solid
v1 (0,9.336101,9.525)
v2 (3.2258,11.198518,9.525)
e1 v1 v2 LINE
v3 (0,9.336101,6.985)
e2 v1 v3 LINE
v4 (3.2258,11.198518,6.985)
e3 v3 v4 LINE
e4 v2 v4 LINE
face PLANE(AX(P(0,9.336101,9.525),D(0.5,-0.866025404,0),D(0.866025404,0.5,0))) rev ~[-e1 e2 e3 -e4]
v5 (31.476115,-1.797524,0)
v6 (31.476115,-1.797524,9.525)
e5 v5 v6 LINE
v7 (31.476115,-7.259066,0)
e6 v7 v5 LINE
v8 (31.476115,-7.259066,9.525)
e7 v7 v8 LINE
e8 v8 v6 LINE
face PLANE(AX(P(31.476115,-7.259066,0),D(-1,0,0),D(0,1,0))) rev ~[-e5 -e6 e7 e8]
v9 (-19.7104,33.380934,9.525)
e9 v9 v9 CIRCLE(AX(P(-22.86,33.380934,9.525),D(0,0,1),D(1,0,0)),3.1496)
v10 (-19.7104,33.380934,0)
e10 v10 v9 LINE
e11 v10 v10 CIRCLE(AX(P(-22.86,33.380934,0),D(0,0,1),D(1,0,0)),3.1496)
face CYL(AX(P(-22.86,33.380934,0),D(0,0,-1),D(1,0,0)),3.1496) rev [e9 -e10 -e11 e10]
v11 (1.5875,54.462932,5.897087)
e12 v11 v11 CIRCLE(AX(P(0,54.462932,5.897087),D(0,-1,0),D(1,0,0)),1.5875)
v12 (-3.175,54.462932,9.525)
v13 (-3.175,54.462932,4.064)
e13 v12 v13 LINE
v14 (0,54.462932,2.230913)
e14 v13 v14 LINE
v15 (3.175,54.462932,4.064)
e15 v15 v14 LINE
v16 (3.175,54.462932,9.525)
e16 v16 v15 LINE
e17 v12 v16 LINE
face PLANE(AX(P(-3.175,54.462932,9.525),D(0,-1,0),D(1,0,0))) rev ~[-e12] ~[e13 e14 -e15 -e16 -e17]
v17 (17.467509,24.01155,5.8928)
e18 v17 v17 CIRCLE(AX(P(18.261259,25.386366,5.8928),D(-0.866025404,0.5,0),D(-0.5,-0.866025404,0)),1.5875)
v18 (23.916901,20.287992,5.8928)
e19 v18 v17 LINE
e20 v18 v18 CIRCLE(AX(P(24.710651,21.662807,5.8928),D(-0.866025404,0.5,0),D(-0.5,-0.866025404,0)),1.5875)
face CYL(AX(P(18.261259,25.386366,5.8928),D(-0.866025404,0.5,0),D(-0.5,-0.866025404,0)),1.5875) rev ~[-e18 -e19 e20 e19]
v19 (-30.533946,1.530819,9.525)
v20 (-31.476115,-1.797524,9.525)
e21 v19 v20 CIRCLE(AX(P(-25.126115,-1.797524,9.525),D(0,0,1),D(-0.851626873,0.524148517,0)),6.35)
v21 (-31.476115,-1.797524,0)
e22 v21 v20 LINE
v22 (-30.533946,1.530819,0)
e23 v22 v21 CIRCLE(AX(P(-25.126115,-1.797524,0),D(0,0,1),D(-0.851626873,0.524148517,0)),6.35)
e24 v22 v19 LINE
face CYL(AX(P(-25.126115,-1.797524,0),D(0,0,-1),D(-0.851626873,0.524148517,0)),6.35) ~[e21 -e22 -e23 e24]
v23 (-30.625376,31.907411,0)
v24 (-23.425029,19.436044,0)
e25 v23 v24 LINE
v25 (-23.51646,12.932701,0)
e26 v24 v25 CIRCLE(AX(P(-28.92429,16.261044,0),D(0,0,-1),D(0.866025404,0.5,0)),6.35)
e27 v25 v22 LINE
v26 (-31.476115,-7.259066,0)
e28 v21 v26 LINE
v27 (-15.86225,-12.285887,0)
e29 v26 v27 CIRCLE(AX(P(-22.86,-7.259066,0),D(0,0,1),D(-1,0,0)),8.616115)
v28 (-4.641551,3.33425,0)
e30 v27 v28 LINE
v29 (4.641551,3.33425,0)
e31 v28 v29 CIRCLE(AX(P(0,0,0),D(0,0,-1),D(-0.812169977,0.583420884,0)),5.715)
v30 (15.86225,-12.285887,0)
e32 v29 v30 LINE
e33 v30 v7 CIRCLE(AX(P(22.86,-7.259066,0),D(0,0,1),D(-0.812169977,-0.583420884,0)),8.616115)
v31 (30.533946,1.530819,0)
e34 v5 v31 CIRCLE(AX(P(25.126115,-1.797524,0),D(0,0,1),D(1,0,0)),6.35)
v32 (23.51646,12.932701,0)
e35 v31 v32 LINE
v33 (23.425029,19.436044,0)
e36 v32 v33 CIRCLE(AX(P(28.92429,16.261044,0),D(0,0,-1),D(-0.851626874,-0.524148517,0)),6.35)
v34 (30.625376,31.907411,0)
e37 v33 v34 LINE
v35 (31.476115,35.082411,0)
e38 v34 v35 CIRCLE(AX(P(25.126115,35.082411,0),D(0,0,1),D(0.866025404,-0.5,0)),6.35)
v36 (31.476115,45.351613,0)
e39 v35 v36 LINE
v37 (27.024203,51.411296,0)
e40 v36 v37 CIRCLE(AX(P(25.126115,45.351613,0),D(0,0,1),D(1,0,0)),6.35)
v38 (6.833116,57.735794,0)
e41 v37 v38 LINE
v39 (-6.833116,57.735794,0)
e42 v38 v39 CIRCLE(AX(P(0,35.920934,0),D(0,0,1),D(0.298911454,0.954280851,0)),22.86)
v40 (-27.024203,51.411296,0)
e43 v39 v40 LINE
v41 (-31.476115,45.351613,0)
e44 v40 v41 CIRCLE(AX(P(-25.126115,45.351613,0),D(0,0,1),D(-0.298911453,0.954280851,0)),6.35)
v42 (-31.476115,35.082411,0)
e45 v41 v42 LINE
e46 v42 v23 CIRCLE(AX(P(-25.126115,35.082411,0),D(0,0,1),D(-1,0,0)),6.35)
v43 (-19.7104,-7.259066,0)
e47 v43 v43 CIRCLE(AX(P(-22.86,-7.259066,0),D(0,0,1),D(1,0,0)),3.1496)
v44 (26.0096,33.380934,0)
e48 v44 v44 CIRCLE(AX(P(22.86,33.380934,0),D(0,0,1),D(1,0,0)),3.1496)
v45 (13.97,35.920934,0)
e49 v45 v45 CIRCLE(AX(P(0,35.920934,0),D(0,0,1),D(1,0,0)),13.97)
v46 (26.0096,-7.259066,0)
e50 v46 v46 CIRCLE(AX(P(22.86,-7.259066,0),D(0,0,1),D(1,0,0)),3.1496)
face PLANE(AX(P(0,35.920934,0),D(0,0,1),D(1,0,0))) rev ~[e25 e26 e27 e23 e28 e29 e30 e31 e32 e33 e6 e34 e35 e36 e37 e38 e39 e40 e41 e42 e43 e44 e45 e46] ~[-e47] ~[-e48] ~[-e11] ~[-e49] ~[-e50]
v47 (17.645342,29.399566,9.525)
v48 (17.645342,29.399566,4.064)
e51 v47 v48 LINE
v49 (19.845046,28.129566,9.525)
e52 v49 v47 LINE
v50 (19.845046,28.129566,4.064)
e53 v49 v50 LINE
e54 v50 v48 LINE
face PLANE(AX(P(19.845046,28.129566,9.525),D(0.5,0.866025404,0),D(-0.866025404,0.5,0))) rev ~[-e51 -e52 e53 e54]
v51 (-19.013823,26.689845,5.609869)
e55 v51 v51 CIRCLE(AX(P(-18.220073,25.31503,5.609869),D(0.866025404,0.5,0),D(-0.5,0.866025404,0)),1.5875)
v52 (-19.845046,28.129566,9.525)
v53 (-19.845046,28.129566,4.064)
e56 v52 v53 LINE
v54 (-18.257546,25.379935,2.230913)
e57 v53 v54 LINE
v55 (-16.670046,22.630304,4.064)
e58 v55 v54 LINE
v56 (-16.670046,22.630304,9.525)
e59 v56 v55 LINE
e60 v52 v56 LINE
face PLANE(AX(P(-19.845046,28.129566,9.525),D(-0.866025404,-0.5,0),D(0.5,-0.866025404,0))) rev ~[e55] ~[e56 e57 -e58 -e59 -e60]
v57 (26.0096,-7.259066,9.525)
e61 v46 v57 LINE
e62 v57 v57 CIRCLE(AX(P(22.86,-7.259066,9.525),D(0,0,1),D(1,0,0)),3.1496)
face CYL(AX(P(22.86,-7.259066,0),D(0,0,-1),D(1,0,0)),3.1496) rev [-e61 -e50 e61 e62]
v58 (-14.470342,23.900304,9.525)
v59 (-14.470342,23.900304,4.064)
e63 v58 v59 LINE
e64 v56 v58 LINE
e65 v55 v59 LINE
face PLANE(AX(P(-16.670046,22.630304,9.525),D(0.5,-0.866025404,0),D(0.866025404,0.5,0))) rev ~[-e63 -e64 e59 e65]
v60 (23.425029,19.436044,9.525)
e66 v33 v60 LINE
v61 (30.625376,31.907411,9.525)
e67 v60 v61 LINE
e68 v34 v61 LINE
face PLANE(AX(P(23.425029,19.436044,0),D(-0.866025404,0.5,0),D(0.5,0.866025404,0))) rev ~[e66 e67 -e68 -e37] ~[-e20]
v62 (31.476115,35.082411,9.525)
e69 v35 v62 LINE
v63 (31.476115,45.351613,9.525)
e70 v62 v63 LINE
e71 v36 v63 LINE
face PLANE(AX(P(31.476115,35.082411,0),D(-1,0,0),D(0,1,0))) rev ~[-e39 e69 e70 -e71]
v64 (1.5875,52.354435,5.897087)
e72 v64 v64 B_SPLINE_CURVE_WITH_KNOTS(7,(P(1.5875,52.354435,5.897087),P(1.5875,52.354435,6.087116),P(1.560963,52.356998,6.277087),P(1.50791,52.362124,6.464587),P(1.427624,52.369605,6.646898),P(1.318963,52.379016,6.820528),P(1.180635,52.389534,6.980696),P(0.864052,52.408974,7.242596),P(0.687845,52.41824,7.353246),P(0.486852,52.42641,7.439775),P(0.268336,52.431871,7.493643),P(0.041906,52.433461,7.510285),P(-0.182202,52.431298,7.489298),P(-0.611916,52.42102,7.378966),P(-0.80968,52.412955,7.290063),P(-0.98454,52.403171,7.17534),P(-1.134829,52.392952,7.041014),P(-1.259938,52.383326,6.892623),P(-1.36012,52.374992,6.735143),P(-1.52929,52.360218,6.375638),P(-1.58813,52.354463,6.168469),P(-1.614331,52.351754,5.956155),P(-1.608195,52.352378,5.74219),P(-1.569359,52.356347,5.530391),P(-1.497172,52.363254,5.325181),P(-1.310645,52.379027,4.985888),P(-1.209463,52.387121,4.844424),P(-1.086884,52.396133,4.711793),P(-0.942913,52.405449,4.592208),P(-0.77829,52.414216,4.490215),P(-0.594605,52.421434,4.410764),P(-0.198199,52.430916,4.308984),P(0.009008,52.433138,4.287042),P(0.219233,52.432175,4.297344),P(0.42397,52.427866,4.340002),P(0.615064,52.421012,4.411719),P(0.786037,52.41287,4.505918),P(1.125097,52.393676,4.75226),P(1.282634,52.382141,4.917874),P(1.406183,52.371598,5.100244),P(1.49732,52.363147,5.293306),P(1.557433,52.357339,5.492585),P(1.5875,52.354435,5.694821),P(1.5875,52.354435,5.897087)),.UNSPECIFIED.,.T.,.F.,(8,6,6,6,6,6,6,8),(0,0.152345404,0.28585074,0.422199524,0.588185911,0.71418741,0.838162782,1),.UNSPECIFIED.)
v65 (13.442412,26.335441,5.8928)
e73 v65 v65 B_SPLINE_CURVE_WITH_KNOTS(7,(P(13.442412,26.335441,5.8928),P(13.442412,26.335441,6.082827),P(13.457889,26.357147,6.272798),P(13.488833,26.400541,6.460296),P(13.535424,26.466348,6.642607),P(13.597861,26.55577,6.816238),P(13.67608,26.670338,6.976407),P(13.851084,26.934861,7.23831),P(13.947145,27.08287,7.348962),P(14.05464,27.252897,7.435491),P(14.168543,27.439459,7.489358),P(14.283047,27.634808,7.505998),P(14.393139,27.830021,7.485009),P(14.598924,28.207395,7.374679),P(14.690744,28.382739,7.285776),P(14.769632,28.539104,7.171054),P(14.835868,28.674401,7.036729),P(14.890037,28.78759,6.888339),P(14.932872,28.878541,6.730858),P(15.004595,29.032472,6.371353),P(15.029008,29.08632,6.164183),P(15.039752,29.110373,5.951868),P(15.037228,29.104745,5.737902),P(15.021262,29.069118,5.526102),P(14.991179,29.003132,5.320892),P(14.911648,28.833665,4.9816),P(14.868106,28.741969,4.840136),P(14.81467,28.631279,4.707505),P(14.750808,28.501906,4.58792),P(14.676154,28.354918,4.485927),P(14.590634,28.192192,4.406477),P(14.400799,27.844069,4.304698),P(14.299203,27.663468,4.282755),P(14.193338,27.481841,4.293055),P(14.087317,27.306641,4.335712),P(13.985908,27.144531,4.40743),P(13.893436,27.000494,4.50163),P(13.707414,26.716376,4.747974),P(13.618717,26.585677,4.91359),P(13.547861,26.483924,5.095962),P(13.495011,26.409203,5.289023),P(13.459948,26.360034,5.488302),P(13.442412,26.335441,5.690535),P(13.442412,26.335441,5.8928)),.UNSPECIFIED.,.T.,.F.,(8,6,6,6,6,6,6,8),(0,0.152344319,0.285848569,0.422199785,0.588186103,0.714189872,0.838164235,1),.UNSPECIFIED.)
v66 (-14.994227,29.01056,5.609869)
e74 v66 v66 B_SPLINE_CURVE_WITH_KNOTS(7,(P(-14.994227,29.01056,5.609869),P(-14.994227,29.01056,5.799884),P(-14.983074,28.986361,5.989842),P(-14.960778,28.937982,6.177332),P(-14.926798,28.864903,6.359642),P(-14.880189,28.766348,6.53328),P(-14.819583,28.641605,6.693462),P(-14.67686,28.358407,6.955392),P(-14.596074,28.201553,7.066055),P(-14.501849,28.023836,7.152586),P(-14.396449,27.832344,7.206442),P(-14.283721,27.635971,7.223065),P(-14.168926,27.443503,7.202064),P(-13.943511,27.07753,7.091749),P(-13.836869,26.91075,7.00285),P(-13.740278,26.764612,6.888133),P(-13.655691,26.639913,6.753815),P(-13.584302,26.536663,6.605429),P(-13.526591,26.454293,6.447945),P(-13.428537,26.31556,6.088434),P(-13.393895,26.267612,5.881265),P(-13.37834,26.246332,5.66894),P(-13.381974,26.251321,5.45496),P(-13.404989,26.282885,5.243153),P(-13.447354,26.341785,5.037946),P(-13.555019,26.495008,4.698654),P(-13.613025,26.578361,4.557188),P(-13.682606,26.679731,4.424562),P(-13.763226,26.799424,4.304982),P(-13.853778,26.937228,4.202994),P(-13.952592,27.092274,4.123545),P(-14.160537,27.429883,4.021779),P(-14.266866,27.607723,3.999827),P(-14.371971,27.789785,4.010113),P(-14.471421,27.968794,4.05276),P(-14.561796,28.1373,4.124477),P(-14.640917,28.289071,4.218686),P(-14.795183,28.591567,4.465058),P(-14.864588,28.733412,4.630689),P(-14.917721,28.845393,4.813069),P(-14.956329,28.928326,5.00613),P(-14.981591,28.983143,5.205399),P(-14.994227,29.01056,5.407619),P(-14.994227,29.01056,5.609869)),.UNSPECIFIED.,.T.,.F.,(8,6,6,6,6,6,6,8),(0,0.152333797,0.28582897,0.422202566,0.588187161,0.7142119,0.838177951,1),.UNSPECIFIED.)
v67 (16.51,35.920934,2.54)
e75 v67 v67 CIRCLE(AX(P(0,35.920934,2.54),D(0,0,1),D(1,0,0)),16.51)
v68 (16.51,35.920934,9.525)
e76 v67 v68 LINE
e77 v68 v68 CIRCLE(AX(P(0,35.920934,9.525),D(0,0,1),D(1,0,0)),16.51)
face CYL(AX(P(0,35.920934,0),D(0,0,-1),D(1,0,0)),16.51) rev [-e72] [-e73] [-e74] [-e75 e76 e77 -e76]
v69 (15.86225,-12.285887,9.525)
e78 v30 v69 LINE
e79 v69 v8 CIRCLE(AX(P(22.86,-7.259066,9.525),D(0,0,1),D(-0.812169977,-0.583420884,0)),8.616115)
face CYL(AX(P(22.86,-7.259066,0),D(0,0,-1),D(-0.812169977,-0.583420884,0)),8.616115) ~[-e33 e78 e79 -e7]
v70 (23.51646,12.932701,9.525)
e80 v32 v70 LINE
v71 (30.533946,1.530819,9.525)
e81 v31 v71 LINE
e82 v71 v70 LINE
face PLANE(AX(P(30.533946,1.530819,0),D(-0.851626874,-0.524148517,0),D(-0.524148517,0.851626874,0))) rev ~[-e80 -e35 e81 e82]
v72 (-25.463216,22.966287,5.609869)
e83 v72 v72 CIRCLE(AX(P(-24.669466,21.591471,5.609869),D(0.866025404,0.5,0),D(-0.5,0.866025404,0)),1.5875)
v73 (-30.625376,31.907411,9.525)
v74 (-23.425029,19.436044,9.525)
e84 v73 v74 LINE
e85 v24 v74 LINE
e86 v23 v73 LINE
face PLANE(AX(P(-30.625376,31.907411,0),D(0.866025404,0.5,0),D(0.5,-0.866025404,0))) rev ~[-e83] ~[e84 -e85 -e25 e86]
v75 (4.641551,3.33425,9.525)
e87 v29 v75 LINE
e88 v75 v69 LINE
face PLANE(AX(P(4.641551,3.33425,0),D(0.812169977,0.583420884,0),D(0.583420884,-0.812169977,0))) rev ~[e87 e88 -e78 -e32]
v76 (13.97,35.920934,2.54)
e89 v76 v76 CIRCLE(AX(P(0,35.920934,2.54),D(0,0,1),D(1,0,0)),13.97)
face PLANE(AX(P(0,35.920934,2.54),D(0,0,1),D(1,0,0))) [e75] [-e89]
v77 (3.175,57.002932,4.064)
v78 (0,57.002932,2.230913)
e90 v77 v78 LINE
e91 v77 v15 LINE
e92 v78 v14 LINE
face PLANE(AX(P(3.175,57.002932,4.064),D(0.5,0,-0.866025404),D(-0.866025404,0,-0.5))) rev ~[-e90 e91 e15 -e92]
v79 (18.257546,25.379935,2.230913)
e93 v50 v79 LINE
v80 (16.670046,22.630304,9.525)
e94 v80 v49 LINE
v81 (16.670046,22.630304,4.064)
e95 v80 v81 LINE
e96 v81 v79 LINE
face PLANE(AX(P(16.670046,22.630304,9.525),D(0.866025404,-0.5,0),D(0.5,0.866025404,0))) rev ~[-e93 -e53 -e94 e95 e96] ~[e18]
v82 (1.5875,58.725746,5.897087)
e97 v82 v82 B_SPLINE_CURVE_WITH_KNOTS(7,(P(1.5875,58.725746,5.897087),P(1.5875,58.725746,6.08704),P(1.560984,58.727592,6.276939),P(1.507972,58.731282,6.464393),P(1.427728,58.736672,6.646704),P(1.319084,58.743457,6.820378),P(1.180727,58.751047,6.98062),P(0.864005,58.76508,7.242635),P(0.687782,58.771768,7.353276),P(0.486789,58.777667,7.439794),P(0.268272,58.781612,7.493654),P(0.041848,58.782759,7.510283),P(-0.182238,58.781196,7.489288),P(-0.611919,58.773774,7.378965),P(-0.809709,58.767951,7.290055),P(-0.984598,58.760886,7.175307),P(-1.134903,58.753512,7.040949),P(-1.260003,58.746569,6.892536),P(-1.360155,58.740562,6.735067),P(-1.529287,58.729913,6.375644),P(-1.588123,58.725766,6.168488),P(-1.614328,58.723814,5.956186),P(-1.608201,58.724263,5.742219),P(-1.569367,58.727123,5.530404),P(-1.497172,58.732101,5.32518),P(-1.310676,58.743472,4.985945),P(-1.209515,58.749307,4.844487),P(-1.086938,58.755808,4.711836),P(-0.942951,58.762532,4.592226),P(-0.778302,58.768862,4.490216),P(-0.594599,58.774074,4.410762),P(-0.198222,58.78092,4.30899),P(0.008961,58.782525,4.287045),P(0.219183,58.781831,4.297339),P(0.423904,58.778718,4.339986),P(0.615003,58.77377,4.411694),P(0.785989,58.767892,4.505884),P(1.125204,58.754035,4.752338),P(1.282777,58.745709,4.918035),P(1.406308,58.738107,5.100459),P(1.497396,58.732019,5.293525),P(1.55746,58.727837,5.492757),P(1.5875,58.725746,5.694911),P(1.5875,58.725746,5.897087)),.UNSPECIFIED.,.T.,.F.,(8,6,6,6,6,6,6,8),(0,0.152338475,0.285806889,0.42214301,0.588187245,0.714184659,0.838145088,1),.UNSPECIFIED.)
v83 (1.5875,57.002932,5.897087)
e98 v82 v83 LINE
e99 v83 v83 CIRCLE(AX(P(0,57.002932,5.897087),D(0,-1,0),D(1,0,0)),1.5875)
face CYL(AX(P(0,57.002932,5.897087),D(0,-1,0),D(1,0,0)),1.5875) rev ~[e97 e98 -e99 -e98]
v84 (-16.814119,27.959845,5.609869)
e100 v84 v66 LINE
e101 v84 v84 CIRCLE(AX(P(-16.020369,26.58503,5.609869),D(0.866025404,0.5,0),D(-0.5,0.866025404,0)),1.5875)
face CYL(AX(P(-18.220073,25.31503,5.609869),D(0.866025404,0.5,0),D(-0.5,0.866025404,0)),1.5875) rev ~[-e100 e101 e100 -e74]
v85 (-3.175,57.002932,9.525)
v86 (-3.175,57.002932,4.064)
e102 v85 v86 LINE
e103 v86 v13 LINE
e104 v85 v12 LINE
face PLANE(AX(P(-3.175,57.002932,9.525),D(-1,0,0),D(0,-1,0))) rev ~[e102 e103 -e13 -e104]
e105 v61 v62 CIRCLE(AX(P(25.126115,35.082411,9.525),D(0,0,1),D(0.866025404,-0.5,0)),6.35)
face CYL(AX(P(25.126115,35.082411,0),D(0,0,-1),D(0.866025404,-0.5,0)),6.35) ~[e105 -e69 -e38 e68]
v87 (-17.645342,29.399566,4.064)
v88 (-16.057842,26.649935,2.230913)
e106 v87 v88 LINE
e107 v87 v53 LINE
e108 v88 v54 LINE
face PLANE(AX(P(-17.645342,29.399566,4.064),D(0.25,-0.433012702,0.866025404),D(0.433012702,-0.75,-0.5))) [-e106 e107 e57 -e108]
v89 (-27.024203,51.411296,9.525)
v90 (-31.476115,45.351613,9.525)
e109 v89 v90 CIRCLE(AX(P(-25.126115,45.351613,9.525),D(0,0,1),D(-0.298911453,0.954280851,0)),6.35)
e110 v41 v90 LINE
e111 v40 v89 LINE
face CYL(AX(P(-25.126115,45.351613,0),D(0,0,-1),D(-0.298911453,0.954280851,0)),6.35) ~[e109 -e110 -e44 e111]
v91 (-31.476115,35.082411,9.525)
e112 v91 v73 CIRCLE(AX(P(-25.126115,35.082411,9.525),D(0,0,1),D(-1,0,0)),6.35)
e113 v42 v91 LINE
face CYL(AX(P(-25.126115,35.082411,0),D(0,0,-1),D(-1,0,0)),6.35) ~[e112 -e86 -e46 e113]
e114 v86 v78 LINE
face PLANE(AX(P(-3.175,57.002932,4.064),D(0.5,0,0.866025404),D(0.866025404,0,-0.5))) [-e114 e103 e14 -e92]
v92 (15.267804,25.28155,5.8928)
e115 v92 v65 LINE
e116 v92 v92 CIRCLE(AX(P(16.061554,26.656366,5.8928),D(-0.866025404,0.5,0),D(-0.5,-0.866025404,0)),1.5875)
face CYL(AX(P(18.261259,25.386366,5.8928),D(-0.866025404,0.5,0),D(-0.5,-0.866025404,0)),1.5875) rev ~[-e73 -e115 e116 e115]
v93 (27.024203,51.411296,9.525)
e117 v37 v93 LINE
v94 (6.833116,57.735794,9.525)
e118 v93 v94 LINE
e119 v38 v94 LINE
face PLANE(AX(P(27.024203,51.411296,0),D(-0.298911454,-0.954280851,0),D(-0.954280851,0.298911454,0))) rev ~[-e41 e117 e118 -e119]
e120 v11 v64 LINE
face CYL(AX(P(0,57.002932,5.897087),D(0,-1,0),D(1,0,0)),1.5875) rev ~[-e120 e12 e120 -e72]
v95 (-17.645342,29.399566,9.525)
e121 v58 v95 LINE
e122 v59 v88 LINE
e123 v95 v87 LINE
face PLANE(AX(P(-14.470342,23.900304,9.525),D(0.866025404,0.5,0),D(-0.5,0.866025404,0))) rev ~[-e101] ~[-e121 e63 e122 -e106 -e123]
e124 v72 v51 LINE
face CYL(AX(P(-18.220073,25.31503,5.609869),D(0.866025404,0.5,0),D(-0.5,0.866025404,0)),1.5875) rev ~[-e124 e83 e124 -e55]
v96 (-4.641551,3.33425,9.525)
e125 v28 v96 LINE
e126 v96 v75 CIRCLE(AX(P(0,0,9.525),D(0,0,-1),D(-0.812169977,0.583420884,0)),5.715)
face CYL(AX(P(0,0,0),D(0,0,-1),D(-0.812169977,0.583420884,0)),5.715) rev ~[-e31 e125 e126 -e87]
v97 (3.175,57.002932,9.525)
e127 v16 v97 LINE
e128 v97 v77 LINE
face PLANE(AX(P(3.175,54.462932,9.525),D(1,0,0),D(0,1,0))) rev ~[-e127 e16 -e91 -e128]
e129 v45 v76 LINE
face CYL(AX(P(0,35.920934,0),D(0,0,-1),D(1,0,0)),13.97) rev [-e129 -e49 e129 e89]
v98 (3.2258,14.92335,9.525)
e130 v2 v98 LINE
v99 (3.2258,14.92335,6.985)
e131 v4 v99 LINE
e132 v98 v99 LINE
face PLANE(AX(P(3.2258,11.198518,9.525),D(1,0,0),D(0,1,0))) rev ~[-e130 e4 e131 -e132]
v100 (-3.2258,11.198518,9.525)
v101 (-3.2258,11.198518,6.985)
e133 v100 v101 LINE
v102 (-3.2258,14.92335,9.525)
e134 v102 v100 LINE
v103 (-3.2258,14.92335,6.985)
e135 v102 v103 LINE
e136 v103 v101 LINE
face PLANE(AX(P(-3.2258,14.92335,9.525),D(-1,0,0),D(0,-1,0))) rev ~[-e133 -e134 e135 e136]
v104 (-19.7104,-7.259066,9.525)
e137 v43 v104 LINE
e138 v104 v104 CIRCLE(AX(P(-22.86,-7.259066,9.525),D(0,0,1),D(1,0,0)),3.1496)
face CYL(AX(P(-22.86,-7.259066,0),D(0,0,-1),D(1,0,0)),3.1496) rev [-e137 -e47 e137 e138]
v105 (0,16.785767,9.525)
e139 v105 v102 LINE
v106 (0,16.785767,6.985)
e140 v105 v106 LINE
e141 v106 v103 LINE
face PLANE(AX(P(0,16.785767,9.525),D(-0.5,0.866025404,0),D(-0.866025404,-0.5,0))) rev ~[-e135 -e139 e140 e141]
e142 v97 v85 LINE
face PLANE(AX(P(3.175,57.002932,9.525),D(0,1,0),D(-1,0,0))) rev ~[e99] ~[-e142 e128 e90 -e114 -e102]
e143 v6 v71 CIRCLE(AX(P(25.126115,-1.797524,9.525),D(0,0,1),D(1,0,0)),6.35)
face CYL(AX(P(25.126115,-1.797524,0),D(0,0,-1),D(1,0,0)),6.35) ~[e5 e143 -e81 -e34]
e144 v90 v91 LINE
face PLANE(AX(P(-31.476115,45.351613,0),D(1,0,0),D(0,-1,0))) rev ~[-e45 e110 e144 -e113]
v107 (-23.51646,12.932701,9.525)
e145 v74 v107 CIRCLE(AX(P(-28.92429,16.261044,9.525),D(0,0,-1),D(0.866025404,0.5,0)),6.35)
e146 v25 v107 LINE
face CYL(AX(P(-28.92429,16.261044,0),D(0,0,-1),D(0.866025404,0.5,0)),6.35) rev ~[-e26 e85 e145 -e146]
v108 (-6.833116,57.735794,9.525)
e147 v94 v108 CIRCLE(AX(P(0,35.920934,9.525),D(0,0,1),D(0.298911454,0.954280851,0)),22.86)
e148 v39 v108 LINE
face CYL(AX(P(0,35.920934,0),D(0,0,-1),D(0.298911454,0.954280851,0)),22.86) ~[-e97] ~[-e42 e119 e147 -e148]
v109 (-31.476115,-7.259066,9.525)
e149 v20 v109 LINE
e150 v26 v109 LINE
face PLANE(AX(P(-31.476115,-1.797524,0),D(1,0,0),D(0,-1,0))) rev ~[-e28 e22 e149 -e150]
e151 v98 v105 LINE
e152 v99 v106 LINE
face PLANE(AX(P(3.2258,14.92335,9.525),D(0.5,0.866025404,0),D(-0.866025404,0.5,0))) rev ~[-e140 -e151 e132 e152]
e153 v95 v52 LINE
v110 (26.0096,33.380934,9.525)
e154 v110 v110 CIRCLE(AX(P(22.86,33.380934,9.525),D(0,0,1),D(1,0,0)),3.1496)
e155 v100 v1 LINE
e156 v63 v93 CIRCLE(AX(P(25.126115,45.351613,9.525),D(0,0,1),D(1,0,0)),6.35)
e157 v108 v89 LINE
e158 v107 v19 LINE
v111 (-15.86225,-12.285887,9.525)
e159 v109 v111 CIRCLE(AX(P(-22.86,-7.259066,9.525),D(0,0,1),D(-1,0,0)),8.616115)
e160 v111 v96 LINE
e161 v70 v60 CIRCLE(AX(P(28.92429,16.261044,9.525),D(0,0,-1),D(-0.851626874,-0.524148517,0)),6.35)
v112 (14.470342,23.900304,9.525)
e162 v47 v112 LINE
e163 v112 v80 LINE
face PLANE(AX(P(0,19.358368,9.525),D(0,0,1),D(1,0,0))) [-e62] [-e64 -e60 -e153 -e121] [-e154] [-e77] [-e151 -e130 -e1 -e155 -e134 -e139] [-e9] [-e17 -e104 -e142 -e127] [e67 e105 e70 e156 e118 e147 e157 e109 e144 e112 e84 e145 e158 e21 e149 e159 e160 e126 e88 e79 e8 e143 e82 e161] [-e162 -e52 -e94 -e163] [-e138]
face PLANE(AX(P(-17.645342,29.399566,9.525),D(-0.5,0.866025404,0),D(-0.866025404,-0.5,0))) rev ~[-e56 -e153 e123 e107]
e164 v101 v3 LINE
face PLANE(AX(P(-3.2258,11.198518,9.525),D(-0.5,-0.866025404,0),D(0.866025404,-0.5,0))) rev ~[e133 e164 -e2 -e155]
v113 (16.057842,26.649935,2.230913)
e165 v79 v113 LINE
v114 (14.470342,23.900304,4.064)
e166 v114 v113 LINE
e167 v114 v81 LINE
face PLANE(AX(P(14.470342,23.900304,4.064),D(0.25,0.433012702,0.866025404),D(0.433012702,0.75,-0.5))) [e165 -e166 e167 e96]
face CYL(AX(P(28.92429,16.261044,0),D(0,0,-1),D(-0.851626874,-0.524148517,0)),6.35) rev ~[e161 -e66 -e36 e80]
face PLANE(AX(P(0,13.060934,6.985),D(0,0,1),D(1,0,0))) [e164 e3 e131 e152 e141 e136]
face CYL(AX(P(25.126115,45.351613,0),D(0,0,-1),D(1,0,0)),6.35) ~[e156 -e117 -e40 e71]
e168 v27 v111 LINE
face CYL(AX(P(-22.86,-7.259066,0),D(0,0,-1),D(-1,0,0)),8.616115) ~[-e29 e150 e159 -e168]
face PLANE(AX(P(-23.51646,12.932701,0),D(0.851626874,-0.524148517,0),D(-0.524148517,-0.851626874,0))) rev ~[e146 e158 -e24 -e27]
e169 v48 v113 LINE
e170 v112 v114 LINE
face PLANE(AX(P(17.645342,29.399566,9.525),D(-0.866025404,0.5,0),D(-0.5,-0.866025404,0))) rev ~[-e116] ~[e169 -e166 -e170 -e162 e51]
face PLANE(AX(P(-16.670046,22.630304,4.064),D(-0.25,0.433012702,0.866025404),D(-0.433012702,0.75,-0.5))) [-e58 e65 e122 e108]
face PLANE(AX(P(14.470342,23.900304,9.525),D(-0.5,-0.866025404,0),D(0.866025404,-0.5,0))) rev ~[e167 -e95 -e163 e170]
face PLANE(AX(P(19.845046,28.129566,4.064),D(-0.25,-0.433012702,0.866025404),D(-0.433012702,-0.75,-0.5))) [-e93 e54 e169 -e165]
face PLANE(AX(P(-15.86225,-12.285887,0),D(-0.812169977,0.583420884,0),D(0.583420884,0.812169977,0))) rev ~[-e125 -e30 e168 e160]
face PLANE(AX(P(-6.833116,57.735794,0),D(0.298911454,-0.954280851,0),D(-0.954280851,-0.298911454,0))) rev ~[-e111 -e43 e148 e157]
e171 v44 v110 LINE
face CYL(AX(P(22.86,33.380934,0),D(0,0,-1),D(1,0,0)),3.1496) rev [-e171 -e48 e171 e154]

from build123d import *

# Parameters (mm, degrees)
F0_R        = 3.1496
F0_R_2      = 16.51
F1_DEPTH    = 9.525
F0_R_3      = 13.97
F2_DEPTH    = 2.54
F4_DEPTH    = 8.636
F5_T1_DEPTH = 2.54
F5_T3_DEPTH = 2.54
F5_T5_DEPTH = 2.54
F5_T7_DEPTH = 2.54
F5_T9_DEPTH = 2.54
F6_R        = 1.5875
F9_DEPTH    = 5.08
F7_R        = 1.5875
F10_DEPTH   = 20.32
F8_R        = 1.5875
F11_DEPTH   = 20.32
F13_DEPTH   = 2.54


# Not quite as in the source:
# - a fillet or chamfer that OpenCascade refuses, or shapes differently, is made with other operations: its cross-section is extruded or revolved along the edge and cut away or added
# - a feature names something its author has since deleted; it is built from what else it names


with BuildPart() as f1:
    # F0 (on Top) → F1 (new body)
    with BuildSketch(Plane.XY):
        with BuildLine():
            ThreePointArc((6.8331158271, 57.7357942584), (0, 58.780934), (-6.8331158271, 57.7357942584))
            Line((-6.8331158271, 57.7357942584), (-27.0242026981, 51.4112964789))
            ThreePointArc((-27.0242026981, 51.4112964789), (-30.2435047856, 49.1112435687), (-31.4761149683, 45.3516130738))
            Line((-31.4761149683, 45.3516130738), (-31.4761149683, 35.0824113719))
            ThreePointArc((-31.4761149683, 35.0824113719), (-31.2597439653, 33.4389104355), (-30.6253762824, 31.9074113719))
            Line((-30.6253762824, 31.9074113719), (-23.4250291837, 19.436044365))
            ThreePointArc((-23.4250291837, 19.436044365), (-22.5749179632, 16.1717783736), (-23.516459851, 12.9327012793))
            Line((-23.516459851, 12.9327012793), (-30.5339456151, 1.5308194413))
            ThreePointArc((-30.5339456151, 1.5308194413), (-31.2360341416, -0.0679607815), (-31.4761149683, -1.7975236443))
            Line((-31.4761149683, -1.7975236443), (-31.4761149683, -7.259066))
            ThreePointArc((-31.4761149683, -7.259066), (-25.5004563551, -15.4606163037), (-15.8622501042, -12.2858874155))
            Line((-15.8622501042, -12.2858874155), (-4.6415514186, 3.3342503548))
            ThreePointArc((-4.6415514186, 3.3342503548), (0, 5.715), (4.6415514186, 3.3342503548))
            Line((4.6415514186, 3.3342503548), (15.8622501042, -12.2858874155))
            ThreePointArc((15.8622501042, -12.2858874155), (25.5004563551, -15.4606163037), (31.4761149683, -7.259066))
            Line((31.4761149683, -7.259066), (31.4761149683, -1.7975236443))
            ThreePointArc((31.4761149683, -1.7975236443), (31.2360341416, -0.0679607815), (30.5339456151, 1.5308194413))
            Line((30.5339456151, 1.5308194413), (23.516459851, 12.9327012793))
            ThreePointArc((23.516459851, 12.9327012793), (22.5749179632, 16.1717783736), (23.4250291837, 19.436044365))
            Line((23.4250291837, 19.436044365), (30.6253762824, 31.9074113719))
            ThreePointArc((30.6253762824, 31.9074113719), (31.2597439653, 33.4389104355), (31.4761149683, 35.0824113719))
            Line((31.4761149683, 35.0824113719), (31.4761149683, 45.3516130738))
            ThreePointArc((31.4761149683, 45.3516130738), (30.2435047856, 49.1112435687), (27.0242026981, 51.4112964789))
            Line((27.0242026981, 51.4112964789), (6.8331158271, 57.7357942584))
        make_face()
        with Locations((-22.86, -7.259066)):
            Circle(F0_R, mode=Mode.SUBTRACT)
        with Locations((22.86, -7.259066)):
            Circle(F0_R, mode=Mode.SUBTRACT)
        with Locations((-22.86, 33.380934)):
            Circle(F0_R, mode=Mode.SUBTRACT)
        with Locations((0, 35.920934)):
            Circle(F0_R_2, mode=Mode.SUBTRACT)
        with Locations((22.86, 33.380934)):
            Circle(F0_R, mode=Mode.SUBTRACT)
    extrude(amount=F1_DEPTH)

    # F0 (on Top) → F2 (join)
    with BuildSketch(Plane.XY):
        with Locations((0, 35.920934)):
            Circle(F0_R_2)
        with Locations((0, 35.920934)):
            Circle(F0_R_3, mode=Mode.SUBTRACT)
    extrude(amount=F2_DEPTH)

    # F3 (on face) → F4 (cut)
    with BuildSketch(Plane.XY.offset(9.525)):
        Polygon((17.6453415423, 29.39956552), (14.4703415423, 23.900304206), (16.6700460679, 22.630304206), (19.8450460679, 28.12956552), align=None)
        Polygon((-3.175, 57.002932274), (-3.175, 54.462932274), (0, 54.462932274), (3.175, 54.462932274), (3.175, 57.002932274), align=None)
        Polygon((-14.4703415423, 23.900304206), (-17.6453415423, 29.39956552), (-19.8450460679, 28.12956552), (-16.6700460679, 22.630304206), align=None)
    extrude(amount=-F4_DEPTH, mode=Mode.SUBTRACT)

    # F5: chamfer of 3.175 x 5.499261314 on 6 edges, made by hand

    # F5_s2 → F5_t1 (join)
    with BuildSketch(Plane(origin=(-0.5036208564, -0.290765637, 0), x_dir=(0, 0, 1), z_dir=(-0.8660254038, -0.5, 0))):
        Polygon((4.064, 34.2834413717), (0.889, 28.7841800576), (0.889, 34.2834413717), align=None)
    extrude(amount=F5_T1_DEPTH)

    # F5_s4 → F5_t3 (join)
    with BuildSketch(Plane(origin=(-2.703325382, -1.560765637, 0), x_dir=(0, 0, 1), z_dir=(0.8660254038, 0.5, 0))):
        Polygon((4.064, -27.9334413717), (0.889, -33.4327026857), (0.889, -27.9334413717), align=None)
    extrude(amount=F5_T3_DEPTH)

    # F5_s6 → F5_t5 (join)
    with BuildSketch(Plane.XZ.offset(-57.002932274)):
        Polygon((-3.175, 4.064), (2.324261314, 0.889), (-3.175, 0.889), align=None)
        Polygon((3.175, 4.064), (-2.324261314, 0.889), (3.175, 0.889), align=None)
    extrude(amount=F5_T5_DEPTH)

    # F5_s8 → F5_t7 (join)
    with BuildSketch(Plane(origin=(2.703325382, -1.560765637, 0), x_dir=(0, 0, 1), z_dir=(-0.8660254038, 0.5, 0))):
        Polygon((4.064, 34.2834413717), (0.889, 28.7841800576), (0.889, 34.2834413717), align=None)
    extrude(amount=F5_T7_DEPTH)

    # F5_s10 → F5_t9 (join)
    with BuildSketch(Plane(origin=(0.5036208564, -0.290765637, 0), x_dir=(0, 0, 1), z_dir=(0.8660254038, -0.5, 0))):
        Polygon((4.064, -27.9334413717), (0.889, -33.4327026857), (0.889, -27.9334413717), align=None)
    extrude(amount=F5_T9_DEPTH)

    # F6 (on face) → F9 (cut, symmetric)
    with BuildSketch(Plane.XZ.offset(-57.002932274)):
        with Locations((0, 5.8970871047)):
            Circle(F6_R)
    extrude(amount=F9_DEPTH, both=True, mode=Mode.SUBTRACT)

    # F7 (on face) → F10 (cut, symmetric)
    with BuildSketch(Plane(origin=(-2.703325382, -1.560765637, 0), x_dir=(-0.5, 0.8660254038, 0), z_dir=(0.8660254038, 0.5, 0))):
        with Locations((31.0334954411, 5.6098689985)):
            Circle(F7_R)
    extrude(amount=F10_DEPTH, both=True, mode=Mode.SUBTRACT)

    # F8 (on face) → F11 (cut, symmetric)
    with BuildSketch(Plane(origin=(2.703325382, -1.560765637, 0), x_dir=(-0.5, -0.8660254038, 0), z_dir=(-0.8660254038, 0.5, 0))):
        with Locations((-31.1158668548, 5.8928)):
            Circle(F8_R)
    extrude(amount=F11_DEPTH, both=True, mode=Mode.SUBTRACT)

    # F12 (on face) → F13 (cut)
    with BuildSketch(Plane.XY.offset(9.525)):
        Polygon((3.2258, 11.1985175016), (3.2258, 14.9233504984), (0, 16.7857669967), (-3.2258, 14.9233504984), (-3.2258, 11.1985175016), (0, 9.3361010033), align=None)
    extrude(amount=-F13_DEPTH, mode=Mode.SUBTRACT)


with BuildPart() as f14_1:
    # F14: copy of F1
    add(f1.part)


solid = f1.part
